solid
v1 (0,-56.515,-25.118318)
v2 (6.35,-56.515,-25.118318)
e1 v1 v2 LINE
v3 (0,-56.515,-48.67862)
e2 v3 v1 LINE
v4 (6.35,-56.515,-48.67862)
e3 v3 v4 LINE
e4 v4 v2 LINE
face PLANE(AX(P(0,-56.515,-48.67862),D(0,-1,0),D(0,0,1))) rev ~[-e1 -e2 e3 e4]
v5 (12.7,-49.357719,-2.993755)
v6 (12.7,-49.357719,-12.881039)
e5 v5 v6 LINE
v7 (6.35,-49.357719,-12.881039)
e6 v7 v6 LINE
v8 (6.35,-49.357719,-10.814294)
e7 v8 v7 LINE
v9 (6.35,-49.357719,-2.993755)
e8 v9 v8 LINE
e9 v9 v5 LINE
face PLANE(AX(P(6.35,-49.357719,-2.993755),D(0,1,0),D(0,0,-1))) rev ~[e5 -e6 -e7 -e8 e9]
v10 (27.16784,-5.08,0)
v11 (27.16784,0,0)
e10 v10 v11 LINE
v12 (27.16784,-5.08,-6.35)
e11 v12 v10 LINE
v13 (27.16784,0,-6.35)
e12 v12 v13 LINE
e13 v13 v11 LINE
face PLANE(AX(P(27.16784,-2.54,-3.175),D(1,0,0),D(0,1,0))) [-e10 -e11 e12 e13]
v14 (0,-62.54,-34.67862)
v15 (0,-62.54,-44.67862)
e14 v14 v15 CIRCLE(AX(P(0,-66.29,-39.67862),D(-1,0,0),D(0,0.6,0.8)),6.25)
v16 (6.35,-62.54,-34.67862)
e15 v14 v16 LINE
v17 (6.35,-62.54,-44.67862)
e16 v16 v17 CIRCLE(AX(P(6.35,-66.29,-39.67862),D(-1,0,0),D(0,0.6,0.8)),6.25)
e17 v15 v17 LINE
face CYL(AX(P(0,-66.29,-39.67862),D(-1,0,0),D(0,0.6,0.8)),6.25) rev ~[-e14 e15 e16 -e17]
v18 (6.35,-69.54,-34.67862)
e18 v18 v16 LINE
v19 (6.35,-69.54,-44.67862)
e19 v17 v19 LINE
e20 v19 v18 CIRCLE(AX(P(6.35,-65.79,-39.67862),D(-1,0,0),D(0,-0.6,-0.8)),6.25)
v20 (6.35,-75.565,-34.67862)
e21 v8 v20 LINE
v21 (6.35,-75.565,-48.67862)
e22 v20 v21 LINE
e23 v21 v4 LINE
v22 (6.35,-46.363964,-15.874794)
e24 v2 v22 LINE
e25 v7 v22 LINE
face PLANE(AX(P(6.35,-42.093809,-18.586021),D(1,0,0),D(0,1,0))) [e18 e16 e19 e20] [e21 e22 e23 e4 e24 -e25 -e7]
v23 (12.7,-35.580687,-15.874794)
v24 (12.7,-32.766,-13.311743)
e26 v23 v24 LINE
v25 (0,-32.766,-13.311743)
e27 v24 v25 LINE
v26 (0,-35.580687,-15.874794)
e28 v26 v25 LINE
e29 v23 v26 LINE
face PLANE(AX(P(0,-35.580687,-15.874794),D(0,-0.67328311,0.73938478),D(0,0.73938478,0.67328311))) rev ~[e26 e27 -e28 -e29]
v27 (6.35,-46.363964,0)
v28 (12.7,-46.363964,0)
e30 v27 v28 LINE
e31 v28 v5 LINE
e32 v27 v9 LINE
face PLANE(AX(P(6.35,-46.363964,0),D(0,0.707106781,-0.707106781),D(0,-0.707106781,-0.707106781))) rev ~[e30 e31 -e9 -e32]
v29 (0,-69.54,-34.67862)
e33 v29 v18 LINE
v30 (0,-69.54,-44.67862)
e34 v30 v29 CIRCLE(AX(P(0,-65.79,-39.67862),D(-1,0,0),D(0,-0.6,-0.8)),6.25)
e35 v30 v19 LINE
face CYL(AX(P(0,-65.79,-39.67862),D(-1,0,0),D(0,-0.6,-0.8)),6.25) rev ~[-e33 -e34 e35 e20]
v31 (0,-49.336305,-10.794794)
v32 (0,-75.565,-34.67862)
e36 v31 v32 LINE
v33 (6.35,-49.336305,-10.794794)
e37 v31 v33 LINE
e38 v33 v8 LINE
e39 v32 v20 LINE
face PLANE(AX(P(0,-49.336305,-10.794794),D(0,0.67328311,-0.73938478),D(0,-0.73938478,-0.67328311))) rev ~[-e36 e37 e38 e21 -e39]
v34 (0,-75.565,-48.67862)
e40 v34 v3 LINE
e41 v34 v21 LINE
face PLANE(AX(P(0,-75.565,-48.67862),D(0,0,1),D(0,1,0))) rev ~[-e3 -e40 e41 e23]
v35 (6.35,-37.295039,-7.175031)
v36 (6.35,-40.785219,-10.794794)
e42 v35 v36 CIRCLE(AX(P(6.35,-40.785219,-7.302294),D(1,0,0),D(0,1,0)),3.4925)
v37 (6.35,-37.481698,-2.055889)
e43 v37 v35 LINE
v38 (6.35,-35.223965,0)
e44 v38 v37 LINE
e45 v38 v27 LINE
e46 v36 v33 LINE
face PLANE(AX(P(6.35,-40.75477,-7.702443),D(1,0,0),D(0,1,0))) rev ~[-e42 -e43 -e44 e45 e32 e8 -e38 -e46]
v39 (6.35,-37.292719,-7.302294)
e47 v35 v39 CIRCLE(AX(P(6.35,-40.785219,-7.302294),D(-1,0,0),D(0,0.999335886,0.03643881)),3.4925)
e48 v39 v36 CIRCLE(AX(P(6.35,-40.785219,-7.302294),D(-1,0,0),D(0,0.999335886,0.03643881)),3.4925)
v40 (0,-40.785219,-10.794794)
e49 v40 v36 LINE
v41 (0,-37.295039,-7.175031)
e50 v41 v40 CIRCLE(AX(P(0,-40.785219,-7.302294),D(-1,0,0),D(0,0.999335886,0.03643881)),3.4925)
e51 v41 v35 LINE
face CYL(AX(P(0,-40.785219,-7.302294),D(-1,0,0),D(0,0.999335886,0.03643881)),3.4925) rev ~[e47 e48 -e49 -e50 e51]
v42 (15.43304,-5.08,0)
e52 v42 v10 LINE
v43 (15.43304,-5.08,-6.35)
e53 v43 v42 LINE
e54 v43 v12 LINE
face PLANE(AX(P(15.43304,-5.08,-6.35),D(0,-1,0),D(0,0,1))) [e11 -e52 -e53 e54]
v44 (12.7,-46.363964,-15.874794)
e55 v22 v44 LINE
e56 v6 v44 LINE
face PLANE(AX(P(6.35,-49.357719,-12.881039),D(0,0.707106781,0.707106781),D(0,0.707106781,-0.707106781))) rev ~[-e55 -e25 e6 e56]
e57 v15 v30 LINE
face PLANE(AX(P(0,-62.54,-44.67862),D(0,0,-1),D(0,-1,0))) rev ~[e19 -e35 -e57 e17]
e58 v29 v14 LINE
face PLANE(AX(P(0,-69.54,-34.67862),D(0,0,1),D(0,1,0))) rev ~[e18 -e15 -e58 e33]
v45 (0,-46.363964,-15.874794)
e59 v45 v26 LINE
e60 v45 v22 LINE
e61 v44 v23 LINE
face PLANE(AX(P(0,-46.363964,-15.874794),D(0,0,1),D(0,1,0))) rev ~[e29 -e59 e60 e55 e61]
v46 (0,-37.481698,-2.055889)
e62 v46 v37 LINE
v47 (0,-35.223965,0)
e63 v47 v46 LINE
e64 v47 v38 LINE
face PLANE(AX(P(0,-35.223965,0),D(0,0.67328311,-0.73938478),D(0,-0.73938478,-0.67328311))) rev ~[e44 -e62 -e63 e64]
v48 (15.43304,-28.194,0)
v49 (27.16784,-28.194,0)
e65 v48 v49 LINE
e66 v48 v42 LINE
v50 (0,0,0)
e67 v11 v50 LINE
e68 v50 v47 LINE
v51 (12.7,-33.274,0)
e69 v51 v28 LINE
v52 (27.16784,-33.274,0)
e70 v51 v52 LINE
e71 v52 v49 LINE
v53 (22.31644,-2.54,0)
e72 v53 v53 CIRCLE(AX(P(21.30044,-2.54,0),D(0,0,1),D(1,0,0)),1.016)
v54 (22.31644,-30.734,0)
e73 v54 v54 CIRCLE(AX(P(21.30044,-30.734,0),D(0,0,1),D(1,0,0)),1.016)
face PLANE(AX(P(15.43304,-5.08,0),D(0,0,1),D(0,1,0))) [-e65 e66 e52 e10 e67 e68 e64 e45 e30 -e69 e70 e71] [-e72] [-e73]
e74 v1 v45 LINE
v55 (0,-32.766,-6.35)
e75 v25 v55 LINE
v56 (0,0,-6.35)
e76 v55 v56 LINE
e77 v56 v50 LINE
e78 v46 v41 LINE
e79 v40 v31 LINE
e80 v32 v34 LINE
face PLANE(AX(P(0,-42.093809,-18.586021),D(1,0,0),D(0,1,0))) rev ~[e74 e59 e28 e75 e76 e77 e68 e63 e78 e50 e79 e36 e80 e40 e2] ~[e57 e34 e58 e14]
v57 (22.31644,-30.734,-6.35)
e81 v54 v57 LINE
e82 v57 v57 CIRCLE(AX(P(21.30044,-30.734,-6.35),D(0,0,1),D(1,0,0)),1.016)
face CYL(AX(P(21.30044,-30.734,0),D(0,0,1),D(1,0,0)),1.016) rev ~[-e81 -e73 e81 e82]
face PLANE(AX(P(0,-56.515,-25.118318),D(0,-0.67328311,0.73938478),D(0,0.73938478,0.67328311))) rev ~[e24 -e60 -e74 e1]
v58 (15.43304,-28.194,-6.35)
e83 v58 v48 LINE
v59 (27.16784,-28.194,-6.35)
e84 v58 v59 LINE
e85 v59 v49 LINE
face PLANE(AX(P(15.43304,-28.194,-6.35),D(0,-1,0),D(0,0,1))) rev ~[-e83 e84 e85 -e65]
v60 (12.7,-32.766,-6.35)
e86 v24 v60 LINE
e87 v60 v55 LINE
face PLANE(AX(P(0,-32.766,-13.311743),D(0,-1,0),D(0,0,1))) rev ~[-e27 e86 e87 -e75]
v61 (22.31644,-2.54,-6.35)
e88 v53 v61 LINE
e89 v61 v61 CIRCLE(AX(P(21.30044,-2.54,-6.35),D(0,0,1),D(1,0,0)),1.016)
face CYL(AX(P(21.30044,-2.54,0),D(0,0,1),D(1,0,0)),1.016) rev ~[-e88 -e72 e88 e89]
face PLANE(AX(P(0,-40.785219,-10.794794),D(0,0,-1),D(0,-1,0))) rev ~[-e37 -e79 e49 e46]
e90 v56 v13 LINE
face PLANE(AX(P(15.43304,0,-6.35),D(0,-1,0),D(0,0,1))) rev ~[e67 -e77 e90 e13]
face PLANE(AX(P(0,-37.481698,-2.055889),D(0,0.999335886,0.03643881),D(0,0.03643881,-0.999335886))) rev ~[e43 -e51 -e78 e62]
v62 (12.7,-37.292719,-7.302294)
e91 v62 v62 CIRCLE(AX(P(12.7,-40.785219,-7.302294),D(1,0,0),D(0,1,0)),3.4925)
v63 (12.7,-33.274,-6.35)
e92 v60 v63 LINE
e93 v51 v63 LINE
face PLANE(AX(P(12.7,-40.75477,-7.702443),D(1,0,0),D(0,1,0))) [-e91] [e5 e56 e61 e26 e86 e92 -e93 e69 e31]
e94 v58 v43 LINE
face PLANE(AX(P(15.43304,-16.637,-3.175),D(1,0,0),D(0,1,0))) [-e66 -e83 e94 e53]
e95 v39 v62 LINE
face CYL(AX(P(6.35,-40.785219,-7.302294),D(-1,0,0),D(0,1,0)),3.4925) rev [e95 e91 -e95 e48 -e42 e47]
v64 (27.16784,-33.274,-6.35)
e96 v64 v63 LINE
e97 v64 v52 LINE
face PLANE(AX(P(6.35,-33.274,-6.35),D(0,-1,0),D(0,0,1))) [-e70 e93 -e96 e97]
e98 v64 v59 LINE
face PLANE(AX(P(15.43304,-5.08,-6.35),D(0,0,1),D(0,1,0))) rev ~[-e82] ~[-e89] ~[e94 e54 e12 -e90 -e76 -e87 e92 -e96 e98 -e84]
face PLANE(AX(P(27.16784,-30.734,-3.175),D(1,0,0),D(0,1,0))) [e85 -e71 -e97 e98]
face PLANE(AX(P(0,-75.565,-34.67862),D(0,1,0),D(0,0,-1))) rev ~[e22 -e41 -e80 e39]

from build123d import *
from build123d import SkipClean  # not in build123d's __all__

# Parameters (mm, degrees)
F1_DEPTH = 6.35
F2_R     = 3.4925
F3_DEPTH = 6.35
F4_W     = 33.274
F4_H     = 6.35
F5_DEPTH = 9.08304
F6_W     = 5.08
F6_H     = 6.35
F7_DEPTH = 11.7348
F8_R     = 1.016
F9_DEPTH = 6.35


# Not quite as in the source:
# - after a boolean that leaves OpenCascade's solid faulty, fix() repairs it


with BuildPart() as f1:
    # F0 (on Right) → F1 (new body)
    with BuildSketch(Plane.YZ):
        with BuildLine():
            Line((0, -6.35), (0, 0))
            Line((0, 0), (-32.766, 0))
            Line((-32.766, 0), (-35.2239654818, 0))
            Line((-35.2239654818, 0), (-37.4816982729, -2.0558894312))
            Line((-37.4816982729, -2.0558894312), (-37.2950388694, -7.1750314139))
            ThreePointArc((-37.2950388694, -7.1750314139), (-38.2710574955, -9.7264527612), (-40.7852194514, -10.7947939567))
            Line((-40.7852194514, -10.7947939567), (-49.3363048096, -10.7947939567))
            Line((-49.3363048096, -10.7947939567), (-75.565, -34.67862))
            Line((-75.565, -34.67862), (-75.565, -48.67862))
            Line((-75.565, -48.67862), (-56.515, -48.67862))
            Line((-56.515, -48.67862), (-56.515, -25.1183178527))
            Line((-56.515, -25.1183178527), (-46.3639643027, -15.8747939567))
            Line((-46.3639643027, -15.8747939567), (-35.5806867418, -15.8747939567))
            Line((-35.5806867418, -15.8747939567), (-32.766, -13.3117427633))
            Line((-32.766, -13.3117427633), (-32.766, -6.35))
            Line((-32.766, -6.35), (0, -6.35))
        make_face()
        with BuildLine():
            ThreePointArc((-69.54, -44.67862), (-72.04, -39.67862), (-69.54, -34.67862))
            Line((-69.54, -34.67862), (-62.54, -34.67862))
            ThreePointArc((-62.54, -34.67862), (-60.04, -39.67862), (-62.54, -44.67862))
            Line((-62.54, -44.67862), (-69.54, -44.67862))
        make_face(mode=Mode.SUBTRACT)
    extrude(amount=F1_DEPTH)

    # F2 (on face) → F3 (join)
    with BuildSketch(Plane.YZ.offset(6.35)):
        Polygon((-32.766, -13.3117427633), (-32.766, 0), (-46.3639643027, 0), (-49.3577194514, -2.9937551487), (-49.3577194514, -12.8810388079), (-46.3639643027, -15.8747939567), (-35.5806867418, -15.8747939567), align=None)
        with Locations((-40.7852194514, -7.3022939567)):
            Circle(F2_R, mode=Mode.SUBTRACT)
    with SkipClean():  # cleaning this boolean's faces spoils the solid; the shape is the same uncleaned
        extrude(amount=F3_DEPTH)

    # F4 (on face) → F5 (join)
    with BuildSketch(Plane.YZ.offset(6.35)):
        with Locations((-16.637, -3.175)):
            Rectangle(F4_W, F4_H)
    extrude(amount=F5_DEPTH)

    add(f1.part.fix(), mode=Mode.REPLACE)

    # F6 (on face) → F7 (join)
    with BuildSketch(Plane.YZ.offset(15.43304)):
        with Locations((-2.54, -3.175)):
            Rectangle(F6_W, F6_H)
        with Locations((-30.734, -3.175)):
            Rectangle(F6_W, F6_H)
    extrude(amount=F7_DEPTH)

    add(f1.part.fix(), mode=Mode.REPLACE)

    # F8 (on face) → F9 (cut, through all)
    with BuildSketch(Plane.XY):
        with Locations((21.30044, -30.734)):
            Circle(F8_R)
        with Locations((21.30044, -2.54)):
            Circle(F8_R)
    extrude(amount=-F9_DEPTH, mode=Mode.SUBTRACT)


solid = f1.part
